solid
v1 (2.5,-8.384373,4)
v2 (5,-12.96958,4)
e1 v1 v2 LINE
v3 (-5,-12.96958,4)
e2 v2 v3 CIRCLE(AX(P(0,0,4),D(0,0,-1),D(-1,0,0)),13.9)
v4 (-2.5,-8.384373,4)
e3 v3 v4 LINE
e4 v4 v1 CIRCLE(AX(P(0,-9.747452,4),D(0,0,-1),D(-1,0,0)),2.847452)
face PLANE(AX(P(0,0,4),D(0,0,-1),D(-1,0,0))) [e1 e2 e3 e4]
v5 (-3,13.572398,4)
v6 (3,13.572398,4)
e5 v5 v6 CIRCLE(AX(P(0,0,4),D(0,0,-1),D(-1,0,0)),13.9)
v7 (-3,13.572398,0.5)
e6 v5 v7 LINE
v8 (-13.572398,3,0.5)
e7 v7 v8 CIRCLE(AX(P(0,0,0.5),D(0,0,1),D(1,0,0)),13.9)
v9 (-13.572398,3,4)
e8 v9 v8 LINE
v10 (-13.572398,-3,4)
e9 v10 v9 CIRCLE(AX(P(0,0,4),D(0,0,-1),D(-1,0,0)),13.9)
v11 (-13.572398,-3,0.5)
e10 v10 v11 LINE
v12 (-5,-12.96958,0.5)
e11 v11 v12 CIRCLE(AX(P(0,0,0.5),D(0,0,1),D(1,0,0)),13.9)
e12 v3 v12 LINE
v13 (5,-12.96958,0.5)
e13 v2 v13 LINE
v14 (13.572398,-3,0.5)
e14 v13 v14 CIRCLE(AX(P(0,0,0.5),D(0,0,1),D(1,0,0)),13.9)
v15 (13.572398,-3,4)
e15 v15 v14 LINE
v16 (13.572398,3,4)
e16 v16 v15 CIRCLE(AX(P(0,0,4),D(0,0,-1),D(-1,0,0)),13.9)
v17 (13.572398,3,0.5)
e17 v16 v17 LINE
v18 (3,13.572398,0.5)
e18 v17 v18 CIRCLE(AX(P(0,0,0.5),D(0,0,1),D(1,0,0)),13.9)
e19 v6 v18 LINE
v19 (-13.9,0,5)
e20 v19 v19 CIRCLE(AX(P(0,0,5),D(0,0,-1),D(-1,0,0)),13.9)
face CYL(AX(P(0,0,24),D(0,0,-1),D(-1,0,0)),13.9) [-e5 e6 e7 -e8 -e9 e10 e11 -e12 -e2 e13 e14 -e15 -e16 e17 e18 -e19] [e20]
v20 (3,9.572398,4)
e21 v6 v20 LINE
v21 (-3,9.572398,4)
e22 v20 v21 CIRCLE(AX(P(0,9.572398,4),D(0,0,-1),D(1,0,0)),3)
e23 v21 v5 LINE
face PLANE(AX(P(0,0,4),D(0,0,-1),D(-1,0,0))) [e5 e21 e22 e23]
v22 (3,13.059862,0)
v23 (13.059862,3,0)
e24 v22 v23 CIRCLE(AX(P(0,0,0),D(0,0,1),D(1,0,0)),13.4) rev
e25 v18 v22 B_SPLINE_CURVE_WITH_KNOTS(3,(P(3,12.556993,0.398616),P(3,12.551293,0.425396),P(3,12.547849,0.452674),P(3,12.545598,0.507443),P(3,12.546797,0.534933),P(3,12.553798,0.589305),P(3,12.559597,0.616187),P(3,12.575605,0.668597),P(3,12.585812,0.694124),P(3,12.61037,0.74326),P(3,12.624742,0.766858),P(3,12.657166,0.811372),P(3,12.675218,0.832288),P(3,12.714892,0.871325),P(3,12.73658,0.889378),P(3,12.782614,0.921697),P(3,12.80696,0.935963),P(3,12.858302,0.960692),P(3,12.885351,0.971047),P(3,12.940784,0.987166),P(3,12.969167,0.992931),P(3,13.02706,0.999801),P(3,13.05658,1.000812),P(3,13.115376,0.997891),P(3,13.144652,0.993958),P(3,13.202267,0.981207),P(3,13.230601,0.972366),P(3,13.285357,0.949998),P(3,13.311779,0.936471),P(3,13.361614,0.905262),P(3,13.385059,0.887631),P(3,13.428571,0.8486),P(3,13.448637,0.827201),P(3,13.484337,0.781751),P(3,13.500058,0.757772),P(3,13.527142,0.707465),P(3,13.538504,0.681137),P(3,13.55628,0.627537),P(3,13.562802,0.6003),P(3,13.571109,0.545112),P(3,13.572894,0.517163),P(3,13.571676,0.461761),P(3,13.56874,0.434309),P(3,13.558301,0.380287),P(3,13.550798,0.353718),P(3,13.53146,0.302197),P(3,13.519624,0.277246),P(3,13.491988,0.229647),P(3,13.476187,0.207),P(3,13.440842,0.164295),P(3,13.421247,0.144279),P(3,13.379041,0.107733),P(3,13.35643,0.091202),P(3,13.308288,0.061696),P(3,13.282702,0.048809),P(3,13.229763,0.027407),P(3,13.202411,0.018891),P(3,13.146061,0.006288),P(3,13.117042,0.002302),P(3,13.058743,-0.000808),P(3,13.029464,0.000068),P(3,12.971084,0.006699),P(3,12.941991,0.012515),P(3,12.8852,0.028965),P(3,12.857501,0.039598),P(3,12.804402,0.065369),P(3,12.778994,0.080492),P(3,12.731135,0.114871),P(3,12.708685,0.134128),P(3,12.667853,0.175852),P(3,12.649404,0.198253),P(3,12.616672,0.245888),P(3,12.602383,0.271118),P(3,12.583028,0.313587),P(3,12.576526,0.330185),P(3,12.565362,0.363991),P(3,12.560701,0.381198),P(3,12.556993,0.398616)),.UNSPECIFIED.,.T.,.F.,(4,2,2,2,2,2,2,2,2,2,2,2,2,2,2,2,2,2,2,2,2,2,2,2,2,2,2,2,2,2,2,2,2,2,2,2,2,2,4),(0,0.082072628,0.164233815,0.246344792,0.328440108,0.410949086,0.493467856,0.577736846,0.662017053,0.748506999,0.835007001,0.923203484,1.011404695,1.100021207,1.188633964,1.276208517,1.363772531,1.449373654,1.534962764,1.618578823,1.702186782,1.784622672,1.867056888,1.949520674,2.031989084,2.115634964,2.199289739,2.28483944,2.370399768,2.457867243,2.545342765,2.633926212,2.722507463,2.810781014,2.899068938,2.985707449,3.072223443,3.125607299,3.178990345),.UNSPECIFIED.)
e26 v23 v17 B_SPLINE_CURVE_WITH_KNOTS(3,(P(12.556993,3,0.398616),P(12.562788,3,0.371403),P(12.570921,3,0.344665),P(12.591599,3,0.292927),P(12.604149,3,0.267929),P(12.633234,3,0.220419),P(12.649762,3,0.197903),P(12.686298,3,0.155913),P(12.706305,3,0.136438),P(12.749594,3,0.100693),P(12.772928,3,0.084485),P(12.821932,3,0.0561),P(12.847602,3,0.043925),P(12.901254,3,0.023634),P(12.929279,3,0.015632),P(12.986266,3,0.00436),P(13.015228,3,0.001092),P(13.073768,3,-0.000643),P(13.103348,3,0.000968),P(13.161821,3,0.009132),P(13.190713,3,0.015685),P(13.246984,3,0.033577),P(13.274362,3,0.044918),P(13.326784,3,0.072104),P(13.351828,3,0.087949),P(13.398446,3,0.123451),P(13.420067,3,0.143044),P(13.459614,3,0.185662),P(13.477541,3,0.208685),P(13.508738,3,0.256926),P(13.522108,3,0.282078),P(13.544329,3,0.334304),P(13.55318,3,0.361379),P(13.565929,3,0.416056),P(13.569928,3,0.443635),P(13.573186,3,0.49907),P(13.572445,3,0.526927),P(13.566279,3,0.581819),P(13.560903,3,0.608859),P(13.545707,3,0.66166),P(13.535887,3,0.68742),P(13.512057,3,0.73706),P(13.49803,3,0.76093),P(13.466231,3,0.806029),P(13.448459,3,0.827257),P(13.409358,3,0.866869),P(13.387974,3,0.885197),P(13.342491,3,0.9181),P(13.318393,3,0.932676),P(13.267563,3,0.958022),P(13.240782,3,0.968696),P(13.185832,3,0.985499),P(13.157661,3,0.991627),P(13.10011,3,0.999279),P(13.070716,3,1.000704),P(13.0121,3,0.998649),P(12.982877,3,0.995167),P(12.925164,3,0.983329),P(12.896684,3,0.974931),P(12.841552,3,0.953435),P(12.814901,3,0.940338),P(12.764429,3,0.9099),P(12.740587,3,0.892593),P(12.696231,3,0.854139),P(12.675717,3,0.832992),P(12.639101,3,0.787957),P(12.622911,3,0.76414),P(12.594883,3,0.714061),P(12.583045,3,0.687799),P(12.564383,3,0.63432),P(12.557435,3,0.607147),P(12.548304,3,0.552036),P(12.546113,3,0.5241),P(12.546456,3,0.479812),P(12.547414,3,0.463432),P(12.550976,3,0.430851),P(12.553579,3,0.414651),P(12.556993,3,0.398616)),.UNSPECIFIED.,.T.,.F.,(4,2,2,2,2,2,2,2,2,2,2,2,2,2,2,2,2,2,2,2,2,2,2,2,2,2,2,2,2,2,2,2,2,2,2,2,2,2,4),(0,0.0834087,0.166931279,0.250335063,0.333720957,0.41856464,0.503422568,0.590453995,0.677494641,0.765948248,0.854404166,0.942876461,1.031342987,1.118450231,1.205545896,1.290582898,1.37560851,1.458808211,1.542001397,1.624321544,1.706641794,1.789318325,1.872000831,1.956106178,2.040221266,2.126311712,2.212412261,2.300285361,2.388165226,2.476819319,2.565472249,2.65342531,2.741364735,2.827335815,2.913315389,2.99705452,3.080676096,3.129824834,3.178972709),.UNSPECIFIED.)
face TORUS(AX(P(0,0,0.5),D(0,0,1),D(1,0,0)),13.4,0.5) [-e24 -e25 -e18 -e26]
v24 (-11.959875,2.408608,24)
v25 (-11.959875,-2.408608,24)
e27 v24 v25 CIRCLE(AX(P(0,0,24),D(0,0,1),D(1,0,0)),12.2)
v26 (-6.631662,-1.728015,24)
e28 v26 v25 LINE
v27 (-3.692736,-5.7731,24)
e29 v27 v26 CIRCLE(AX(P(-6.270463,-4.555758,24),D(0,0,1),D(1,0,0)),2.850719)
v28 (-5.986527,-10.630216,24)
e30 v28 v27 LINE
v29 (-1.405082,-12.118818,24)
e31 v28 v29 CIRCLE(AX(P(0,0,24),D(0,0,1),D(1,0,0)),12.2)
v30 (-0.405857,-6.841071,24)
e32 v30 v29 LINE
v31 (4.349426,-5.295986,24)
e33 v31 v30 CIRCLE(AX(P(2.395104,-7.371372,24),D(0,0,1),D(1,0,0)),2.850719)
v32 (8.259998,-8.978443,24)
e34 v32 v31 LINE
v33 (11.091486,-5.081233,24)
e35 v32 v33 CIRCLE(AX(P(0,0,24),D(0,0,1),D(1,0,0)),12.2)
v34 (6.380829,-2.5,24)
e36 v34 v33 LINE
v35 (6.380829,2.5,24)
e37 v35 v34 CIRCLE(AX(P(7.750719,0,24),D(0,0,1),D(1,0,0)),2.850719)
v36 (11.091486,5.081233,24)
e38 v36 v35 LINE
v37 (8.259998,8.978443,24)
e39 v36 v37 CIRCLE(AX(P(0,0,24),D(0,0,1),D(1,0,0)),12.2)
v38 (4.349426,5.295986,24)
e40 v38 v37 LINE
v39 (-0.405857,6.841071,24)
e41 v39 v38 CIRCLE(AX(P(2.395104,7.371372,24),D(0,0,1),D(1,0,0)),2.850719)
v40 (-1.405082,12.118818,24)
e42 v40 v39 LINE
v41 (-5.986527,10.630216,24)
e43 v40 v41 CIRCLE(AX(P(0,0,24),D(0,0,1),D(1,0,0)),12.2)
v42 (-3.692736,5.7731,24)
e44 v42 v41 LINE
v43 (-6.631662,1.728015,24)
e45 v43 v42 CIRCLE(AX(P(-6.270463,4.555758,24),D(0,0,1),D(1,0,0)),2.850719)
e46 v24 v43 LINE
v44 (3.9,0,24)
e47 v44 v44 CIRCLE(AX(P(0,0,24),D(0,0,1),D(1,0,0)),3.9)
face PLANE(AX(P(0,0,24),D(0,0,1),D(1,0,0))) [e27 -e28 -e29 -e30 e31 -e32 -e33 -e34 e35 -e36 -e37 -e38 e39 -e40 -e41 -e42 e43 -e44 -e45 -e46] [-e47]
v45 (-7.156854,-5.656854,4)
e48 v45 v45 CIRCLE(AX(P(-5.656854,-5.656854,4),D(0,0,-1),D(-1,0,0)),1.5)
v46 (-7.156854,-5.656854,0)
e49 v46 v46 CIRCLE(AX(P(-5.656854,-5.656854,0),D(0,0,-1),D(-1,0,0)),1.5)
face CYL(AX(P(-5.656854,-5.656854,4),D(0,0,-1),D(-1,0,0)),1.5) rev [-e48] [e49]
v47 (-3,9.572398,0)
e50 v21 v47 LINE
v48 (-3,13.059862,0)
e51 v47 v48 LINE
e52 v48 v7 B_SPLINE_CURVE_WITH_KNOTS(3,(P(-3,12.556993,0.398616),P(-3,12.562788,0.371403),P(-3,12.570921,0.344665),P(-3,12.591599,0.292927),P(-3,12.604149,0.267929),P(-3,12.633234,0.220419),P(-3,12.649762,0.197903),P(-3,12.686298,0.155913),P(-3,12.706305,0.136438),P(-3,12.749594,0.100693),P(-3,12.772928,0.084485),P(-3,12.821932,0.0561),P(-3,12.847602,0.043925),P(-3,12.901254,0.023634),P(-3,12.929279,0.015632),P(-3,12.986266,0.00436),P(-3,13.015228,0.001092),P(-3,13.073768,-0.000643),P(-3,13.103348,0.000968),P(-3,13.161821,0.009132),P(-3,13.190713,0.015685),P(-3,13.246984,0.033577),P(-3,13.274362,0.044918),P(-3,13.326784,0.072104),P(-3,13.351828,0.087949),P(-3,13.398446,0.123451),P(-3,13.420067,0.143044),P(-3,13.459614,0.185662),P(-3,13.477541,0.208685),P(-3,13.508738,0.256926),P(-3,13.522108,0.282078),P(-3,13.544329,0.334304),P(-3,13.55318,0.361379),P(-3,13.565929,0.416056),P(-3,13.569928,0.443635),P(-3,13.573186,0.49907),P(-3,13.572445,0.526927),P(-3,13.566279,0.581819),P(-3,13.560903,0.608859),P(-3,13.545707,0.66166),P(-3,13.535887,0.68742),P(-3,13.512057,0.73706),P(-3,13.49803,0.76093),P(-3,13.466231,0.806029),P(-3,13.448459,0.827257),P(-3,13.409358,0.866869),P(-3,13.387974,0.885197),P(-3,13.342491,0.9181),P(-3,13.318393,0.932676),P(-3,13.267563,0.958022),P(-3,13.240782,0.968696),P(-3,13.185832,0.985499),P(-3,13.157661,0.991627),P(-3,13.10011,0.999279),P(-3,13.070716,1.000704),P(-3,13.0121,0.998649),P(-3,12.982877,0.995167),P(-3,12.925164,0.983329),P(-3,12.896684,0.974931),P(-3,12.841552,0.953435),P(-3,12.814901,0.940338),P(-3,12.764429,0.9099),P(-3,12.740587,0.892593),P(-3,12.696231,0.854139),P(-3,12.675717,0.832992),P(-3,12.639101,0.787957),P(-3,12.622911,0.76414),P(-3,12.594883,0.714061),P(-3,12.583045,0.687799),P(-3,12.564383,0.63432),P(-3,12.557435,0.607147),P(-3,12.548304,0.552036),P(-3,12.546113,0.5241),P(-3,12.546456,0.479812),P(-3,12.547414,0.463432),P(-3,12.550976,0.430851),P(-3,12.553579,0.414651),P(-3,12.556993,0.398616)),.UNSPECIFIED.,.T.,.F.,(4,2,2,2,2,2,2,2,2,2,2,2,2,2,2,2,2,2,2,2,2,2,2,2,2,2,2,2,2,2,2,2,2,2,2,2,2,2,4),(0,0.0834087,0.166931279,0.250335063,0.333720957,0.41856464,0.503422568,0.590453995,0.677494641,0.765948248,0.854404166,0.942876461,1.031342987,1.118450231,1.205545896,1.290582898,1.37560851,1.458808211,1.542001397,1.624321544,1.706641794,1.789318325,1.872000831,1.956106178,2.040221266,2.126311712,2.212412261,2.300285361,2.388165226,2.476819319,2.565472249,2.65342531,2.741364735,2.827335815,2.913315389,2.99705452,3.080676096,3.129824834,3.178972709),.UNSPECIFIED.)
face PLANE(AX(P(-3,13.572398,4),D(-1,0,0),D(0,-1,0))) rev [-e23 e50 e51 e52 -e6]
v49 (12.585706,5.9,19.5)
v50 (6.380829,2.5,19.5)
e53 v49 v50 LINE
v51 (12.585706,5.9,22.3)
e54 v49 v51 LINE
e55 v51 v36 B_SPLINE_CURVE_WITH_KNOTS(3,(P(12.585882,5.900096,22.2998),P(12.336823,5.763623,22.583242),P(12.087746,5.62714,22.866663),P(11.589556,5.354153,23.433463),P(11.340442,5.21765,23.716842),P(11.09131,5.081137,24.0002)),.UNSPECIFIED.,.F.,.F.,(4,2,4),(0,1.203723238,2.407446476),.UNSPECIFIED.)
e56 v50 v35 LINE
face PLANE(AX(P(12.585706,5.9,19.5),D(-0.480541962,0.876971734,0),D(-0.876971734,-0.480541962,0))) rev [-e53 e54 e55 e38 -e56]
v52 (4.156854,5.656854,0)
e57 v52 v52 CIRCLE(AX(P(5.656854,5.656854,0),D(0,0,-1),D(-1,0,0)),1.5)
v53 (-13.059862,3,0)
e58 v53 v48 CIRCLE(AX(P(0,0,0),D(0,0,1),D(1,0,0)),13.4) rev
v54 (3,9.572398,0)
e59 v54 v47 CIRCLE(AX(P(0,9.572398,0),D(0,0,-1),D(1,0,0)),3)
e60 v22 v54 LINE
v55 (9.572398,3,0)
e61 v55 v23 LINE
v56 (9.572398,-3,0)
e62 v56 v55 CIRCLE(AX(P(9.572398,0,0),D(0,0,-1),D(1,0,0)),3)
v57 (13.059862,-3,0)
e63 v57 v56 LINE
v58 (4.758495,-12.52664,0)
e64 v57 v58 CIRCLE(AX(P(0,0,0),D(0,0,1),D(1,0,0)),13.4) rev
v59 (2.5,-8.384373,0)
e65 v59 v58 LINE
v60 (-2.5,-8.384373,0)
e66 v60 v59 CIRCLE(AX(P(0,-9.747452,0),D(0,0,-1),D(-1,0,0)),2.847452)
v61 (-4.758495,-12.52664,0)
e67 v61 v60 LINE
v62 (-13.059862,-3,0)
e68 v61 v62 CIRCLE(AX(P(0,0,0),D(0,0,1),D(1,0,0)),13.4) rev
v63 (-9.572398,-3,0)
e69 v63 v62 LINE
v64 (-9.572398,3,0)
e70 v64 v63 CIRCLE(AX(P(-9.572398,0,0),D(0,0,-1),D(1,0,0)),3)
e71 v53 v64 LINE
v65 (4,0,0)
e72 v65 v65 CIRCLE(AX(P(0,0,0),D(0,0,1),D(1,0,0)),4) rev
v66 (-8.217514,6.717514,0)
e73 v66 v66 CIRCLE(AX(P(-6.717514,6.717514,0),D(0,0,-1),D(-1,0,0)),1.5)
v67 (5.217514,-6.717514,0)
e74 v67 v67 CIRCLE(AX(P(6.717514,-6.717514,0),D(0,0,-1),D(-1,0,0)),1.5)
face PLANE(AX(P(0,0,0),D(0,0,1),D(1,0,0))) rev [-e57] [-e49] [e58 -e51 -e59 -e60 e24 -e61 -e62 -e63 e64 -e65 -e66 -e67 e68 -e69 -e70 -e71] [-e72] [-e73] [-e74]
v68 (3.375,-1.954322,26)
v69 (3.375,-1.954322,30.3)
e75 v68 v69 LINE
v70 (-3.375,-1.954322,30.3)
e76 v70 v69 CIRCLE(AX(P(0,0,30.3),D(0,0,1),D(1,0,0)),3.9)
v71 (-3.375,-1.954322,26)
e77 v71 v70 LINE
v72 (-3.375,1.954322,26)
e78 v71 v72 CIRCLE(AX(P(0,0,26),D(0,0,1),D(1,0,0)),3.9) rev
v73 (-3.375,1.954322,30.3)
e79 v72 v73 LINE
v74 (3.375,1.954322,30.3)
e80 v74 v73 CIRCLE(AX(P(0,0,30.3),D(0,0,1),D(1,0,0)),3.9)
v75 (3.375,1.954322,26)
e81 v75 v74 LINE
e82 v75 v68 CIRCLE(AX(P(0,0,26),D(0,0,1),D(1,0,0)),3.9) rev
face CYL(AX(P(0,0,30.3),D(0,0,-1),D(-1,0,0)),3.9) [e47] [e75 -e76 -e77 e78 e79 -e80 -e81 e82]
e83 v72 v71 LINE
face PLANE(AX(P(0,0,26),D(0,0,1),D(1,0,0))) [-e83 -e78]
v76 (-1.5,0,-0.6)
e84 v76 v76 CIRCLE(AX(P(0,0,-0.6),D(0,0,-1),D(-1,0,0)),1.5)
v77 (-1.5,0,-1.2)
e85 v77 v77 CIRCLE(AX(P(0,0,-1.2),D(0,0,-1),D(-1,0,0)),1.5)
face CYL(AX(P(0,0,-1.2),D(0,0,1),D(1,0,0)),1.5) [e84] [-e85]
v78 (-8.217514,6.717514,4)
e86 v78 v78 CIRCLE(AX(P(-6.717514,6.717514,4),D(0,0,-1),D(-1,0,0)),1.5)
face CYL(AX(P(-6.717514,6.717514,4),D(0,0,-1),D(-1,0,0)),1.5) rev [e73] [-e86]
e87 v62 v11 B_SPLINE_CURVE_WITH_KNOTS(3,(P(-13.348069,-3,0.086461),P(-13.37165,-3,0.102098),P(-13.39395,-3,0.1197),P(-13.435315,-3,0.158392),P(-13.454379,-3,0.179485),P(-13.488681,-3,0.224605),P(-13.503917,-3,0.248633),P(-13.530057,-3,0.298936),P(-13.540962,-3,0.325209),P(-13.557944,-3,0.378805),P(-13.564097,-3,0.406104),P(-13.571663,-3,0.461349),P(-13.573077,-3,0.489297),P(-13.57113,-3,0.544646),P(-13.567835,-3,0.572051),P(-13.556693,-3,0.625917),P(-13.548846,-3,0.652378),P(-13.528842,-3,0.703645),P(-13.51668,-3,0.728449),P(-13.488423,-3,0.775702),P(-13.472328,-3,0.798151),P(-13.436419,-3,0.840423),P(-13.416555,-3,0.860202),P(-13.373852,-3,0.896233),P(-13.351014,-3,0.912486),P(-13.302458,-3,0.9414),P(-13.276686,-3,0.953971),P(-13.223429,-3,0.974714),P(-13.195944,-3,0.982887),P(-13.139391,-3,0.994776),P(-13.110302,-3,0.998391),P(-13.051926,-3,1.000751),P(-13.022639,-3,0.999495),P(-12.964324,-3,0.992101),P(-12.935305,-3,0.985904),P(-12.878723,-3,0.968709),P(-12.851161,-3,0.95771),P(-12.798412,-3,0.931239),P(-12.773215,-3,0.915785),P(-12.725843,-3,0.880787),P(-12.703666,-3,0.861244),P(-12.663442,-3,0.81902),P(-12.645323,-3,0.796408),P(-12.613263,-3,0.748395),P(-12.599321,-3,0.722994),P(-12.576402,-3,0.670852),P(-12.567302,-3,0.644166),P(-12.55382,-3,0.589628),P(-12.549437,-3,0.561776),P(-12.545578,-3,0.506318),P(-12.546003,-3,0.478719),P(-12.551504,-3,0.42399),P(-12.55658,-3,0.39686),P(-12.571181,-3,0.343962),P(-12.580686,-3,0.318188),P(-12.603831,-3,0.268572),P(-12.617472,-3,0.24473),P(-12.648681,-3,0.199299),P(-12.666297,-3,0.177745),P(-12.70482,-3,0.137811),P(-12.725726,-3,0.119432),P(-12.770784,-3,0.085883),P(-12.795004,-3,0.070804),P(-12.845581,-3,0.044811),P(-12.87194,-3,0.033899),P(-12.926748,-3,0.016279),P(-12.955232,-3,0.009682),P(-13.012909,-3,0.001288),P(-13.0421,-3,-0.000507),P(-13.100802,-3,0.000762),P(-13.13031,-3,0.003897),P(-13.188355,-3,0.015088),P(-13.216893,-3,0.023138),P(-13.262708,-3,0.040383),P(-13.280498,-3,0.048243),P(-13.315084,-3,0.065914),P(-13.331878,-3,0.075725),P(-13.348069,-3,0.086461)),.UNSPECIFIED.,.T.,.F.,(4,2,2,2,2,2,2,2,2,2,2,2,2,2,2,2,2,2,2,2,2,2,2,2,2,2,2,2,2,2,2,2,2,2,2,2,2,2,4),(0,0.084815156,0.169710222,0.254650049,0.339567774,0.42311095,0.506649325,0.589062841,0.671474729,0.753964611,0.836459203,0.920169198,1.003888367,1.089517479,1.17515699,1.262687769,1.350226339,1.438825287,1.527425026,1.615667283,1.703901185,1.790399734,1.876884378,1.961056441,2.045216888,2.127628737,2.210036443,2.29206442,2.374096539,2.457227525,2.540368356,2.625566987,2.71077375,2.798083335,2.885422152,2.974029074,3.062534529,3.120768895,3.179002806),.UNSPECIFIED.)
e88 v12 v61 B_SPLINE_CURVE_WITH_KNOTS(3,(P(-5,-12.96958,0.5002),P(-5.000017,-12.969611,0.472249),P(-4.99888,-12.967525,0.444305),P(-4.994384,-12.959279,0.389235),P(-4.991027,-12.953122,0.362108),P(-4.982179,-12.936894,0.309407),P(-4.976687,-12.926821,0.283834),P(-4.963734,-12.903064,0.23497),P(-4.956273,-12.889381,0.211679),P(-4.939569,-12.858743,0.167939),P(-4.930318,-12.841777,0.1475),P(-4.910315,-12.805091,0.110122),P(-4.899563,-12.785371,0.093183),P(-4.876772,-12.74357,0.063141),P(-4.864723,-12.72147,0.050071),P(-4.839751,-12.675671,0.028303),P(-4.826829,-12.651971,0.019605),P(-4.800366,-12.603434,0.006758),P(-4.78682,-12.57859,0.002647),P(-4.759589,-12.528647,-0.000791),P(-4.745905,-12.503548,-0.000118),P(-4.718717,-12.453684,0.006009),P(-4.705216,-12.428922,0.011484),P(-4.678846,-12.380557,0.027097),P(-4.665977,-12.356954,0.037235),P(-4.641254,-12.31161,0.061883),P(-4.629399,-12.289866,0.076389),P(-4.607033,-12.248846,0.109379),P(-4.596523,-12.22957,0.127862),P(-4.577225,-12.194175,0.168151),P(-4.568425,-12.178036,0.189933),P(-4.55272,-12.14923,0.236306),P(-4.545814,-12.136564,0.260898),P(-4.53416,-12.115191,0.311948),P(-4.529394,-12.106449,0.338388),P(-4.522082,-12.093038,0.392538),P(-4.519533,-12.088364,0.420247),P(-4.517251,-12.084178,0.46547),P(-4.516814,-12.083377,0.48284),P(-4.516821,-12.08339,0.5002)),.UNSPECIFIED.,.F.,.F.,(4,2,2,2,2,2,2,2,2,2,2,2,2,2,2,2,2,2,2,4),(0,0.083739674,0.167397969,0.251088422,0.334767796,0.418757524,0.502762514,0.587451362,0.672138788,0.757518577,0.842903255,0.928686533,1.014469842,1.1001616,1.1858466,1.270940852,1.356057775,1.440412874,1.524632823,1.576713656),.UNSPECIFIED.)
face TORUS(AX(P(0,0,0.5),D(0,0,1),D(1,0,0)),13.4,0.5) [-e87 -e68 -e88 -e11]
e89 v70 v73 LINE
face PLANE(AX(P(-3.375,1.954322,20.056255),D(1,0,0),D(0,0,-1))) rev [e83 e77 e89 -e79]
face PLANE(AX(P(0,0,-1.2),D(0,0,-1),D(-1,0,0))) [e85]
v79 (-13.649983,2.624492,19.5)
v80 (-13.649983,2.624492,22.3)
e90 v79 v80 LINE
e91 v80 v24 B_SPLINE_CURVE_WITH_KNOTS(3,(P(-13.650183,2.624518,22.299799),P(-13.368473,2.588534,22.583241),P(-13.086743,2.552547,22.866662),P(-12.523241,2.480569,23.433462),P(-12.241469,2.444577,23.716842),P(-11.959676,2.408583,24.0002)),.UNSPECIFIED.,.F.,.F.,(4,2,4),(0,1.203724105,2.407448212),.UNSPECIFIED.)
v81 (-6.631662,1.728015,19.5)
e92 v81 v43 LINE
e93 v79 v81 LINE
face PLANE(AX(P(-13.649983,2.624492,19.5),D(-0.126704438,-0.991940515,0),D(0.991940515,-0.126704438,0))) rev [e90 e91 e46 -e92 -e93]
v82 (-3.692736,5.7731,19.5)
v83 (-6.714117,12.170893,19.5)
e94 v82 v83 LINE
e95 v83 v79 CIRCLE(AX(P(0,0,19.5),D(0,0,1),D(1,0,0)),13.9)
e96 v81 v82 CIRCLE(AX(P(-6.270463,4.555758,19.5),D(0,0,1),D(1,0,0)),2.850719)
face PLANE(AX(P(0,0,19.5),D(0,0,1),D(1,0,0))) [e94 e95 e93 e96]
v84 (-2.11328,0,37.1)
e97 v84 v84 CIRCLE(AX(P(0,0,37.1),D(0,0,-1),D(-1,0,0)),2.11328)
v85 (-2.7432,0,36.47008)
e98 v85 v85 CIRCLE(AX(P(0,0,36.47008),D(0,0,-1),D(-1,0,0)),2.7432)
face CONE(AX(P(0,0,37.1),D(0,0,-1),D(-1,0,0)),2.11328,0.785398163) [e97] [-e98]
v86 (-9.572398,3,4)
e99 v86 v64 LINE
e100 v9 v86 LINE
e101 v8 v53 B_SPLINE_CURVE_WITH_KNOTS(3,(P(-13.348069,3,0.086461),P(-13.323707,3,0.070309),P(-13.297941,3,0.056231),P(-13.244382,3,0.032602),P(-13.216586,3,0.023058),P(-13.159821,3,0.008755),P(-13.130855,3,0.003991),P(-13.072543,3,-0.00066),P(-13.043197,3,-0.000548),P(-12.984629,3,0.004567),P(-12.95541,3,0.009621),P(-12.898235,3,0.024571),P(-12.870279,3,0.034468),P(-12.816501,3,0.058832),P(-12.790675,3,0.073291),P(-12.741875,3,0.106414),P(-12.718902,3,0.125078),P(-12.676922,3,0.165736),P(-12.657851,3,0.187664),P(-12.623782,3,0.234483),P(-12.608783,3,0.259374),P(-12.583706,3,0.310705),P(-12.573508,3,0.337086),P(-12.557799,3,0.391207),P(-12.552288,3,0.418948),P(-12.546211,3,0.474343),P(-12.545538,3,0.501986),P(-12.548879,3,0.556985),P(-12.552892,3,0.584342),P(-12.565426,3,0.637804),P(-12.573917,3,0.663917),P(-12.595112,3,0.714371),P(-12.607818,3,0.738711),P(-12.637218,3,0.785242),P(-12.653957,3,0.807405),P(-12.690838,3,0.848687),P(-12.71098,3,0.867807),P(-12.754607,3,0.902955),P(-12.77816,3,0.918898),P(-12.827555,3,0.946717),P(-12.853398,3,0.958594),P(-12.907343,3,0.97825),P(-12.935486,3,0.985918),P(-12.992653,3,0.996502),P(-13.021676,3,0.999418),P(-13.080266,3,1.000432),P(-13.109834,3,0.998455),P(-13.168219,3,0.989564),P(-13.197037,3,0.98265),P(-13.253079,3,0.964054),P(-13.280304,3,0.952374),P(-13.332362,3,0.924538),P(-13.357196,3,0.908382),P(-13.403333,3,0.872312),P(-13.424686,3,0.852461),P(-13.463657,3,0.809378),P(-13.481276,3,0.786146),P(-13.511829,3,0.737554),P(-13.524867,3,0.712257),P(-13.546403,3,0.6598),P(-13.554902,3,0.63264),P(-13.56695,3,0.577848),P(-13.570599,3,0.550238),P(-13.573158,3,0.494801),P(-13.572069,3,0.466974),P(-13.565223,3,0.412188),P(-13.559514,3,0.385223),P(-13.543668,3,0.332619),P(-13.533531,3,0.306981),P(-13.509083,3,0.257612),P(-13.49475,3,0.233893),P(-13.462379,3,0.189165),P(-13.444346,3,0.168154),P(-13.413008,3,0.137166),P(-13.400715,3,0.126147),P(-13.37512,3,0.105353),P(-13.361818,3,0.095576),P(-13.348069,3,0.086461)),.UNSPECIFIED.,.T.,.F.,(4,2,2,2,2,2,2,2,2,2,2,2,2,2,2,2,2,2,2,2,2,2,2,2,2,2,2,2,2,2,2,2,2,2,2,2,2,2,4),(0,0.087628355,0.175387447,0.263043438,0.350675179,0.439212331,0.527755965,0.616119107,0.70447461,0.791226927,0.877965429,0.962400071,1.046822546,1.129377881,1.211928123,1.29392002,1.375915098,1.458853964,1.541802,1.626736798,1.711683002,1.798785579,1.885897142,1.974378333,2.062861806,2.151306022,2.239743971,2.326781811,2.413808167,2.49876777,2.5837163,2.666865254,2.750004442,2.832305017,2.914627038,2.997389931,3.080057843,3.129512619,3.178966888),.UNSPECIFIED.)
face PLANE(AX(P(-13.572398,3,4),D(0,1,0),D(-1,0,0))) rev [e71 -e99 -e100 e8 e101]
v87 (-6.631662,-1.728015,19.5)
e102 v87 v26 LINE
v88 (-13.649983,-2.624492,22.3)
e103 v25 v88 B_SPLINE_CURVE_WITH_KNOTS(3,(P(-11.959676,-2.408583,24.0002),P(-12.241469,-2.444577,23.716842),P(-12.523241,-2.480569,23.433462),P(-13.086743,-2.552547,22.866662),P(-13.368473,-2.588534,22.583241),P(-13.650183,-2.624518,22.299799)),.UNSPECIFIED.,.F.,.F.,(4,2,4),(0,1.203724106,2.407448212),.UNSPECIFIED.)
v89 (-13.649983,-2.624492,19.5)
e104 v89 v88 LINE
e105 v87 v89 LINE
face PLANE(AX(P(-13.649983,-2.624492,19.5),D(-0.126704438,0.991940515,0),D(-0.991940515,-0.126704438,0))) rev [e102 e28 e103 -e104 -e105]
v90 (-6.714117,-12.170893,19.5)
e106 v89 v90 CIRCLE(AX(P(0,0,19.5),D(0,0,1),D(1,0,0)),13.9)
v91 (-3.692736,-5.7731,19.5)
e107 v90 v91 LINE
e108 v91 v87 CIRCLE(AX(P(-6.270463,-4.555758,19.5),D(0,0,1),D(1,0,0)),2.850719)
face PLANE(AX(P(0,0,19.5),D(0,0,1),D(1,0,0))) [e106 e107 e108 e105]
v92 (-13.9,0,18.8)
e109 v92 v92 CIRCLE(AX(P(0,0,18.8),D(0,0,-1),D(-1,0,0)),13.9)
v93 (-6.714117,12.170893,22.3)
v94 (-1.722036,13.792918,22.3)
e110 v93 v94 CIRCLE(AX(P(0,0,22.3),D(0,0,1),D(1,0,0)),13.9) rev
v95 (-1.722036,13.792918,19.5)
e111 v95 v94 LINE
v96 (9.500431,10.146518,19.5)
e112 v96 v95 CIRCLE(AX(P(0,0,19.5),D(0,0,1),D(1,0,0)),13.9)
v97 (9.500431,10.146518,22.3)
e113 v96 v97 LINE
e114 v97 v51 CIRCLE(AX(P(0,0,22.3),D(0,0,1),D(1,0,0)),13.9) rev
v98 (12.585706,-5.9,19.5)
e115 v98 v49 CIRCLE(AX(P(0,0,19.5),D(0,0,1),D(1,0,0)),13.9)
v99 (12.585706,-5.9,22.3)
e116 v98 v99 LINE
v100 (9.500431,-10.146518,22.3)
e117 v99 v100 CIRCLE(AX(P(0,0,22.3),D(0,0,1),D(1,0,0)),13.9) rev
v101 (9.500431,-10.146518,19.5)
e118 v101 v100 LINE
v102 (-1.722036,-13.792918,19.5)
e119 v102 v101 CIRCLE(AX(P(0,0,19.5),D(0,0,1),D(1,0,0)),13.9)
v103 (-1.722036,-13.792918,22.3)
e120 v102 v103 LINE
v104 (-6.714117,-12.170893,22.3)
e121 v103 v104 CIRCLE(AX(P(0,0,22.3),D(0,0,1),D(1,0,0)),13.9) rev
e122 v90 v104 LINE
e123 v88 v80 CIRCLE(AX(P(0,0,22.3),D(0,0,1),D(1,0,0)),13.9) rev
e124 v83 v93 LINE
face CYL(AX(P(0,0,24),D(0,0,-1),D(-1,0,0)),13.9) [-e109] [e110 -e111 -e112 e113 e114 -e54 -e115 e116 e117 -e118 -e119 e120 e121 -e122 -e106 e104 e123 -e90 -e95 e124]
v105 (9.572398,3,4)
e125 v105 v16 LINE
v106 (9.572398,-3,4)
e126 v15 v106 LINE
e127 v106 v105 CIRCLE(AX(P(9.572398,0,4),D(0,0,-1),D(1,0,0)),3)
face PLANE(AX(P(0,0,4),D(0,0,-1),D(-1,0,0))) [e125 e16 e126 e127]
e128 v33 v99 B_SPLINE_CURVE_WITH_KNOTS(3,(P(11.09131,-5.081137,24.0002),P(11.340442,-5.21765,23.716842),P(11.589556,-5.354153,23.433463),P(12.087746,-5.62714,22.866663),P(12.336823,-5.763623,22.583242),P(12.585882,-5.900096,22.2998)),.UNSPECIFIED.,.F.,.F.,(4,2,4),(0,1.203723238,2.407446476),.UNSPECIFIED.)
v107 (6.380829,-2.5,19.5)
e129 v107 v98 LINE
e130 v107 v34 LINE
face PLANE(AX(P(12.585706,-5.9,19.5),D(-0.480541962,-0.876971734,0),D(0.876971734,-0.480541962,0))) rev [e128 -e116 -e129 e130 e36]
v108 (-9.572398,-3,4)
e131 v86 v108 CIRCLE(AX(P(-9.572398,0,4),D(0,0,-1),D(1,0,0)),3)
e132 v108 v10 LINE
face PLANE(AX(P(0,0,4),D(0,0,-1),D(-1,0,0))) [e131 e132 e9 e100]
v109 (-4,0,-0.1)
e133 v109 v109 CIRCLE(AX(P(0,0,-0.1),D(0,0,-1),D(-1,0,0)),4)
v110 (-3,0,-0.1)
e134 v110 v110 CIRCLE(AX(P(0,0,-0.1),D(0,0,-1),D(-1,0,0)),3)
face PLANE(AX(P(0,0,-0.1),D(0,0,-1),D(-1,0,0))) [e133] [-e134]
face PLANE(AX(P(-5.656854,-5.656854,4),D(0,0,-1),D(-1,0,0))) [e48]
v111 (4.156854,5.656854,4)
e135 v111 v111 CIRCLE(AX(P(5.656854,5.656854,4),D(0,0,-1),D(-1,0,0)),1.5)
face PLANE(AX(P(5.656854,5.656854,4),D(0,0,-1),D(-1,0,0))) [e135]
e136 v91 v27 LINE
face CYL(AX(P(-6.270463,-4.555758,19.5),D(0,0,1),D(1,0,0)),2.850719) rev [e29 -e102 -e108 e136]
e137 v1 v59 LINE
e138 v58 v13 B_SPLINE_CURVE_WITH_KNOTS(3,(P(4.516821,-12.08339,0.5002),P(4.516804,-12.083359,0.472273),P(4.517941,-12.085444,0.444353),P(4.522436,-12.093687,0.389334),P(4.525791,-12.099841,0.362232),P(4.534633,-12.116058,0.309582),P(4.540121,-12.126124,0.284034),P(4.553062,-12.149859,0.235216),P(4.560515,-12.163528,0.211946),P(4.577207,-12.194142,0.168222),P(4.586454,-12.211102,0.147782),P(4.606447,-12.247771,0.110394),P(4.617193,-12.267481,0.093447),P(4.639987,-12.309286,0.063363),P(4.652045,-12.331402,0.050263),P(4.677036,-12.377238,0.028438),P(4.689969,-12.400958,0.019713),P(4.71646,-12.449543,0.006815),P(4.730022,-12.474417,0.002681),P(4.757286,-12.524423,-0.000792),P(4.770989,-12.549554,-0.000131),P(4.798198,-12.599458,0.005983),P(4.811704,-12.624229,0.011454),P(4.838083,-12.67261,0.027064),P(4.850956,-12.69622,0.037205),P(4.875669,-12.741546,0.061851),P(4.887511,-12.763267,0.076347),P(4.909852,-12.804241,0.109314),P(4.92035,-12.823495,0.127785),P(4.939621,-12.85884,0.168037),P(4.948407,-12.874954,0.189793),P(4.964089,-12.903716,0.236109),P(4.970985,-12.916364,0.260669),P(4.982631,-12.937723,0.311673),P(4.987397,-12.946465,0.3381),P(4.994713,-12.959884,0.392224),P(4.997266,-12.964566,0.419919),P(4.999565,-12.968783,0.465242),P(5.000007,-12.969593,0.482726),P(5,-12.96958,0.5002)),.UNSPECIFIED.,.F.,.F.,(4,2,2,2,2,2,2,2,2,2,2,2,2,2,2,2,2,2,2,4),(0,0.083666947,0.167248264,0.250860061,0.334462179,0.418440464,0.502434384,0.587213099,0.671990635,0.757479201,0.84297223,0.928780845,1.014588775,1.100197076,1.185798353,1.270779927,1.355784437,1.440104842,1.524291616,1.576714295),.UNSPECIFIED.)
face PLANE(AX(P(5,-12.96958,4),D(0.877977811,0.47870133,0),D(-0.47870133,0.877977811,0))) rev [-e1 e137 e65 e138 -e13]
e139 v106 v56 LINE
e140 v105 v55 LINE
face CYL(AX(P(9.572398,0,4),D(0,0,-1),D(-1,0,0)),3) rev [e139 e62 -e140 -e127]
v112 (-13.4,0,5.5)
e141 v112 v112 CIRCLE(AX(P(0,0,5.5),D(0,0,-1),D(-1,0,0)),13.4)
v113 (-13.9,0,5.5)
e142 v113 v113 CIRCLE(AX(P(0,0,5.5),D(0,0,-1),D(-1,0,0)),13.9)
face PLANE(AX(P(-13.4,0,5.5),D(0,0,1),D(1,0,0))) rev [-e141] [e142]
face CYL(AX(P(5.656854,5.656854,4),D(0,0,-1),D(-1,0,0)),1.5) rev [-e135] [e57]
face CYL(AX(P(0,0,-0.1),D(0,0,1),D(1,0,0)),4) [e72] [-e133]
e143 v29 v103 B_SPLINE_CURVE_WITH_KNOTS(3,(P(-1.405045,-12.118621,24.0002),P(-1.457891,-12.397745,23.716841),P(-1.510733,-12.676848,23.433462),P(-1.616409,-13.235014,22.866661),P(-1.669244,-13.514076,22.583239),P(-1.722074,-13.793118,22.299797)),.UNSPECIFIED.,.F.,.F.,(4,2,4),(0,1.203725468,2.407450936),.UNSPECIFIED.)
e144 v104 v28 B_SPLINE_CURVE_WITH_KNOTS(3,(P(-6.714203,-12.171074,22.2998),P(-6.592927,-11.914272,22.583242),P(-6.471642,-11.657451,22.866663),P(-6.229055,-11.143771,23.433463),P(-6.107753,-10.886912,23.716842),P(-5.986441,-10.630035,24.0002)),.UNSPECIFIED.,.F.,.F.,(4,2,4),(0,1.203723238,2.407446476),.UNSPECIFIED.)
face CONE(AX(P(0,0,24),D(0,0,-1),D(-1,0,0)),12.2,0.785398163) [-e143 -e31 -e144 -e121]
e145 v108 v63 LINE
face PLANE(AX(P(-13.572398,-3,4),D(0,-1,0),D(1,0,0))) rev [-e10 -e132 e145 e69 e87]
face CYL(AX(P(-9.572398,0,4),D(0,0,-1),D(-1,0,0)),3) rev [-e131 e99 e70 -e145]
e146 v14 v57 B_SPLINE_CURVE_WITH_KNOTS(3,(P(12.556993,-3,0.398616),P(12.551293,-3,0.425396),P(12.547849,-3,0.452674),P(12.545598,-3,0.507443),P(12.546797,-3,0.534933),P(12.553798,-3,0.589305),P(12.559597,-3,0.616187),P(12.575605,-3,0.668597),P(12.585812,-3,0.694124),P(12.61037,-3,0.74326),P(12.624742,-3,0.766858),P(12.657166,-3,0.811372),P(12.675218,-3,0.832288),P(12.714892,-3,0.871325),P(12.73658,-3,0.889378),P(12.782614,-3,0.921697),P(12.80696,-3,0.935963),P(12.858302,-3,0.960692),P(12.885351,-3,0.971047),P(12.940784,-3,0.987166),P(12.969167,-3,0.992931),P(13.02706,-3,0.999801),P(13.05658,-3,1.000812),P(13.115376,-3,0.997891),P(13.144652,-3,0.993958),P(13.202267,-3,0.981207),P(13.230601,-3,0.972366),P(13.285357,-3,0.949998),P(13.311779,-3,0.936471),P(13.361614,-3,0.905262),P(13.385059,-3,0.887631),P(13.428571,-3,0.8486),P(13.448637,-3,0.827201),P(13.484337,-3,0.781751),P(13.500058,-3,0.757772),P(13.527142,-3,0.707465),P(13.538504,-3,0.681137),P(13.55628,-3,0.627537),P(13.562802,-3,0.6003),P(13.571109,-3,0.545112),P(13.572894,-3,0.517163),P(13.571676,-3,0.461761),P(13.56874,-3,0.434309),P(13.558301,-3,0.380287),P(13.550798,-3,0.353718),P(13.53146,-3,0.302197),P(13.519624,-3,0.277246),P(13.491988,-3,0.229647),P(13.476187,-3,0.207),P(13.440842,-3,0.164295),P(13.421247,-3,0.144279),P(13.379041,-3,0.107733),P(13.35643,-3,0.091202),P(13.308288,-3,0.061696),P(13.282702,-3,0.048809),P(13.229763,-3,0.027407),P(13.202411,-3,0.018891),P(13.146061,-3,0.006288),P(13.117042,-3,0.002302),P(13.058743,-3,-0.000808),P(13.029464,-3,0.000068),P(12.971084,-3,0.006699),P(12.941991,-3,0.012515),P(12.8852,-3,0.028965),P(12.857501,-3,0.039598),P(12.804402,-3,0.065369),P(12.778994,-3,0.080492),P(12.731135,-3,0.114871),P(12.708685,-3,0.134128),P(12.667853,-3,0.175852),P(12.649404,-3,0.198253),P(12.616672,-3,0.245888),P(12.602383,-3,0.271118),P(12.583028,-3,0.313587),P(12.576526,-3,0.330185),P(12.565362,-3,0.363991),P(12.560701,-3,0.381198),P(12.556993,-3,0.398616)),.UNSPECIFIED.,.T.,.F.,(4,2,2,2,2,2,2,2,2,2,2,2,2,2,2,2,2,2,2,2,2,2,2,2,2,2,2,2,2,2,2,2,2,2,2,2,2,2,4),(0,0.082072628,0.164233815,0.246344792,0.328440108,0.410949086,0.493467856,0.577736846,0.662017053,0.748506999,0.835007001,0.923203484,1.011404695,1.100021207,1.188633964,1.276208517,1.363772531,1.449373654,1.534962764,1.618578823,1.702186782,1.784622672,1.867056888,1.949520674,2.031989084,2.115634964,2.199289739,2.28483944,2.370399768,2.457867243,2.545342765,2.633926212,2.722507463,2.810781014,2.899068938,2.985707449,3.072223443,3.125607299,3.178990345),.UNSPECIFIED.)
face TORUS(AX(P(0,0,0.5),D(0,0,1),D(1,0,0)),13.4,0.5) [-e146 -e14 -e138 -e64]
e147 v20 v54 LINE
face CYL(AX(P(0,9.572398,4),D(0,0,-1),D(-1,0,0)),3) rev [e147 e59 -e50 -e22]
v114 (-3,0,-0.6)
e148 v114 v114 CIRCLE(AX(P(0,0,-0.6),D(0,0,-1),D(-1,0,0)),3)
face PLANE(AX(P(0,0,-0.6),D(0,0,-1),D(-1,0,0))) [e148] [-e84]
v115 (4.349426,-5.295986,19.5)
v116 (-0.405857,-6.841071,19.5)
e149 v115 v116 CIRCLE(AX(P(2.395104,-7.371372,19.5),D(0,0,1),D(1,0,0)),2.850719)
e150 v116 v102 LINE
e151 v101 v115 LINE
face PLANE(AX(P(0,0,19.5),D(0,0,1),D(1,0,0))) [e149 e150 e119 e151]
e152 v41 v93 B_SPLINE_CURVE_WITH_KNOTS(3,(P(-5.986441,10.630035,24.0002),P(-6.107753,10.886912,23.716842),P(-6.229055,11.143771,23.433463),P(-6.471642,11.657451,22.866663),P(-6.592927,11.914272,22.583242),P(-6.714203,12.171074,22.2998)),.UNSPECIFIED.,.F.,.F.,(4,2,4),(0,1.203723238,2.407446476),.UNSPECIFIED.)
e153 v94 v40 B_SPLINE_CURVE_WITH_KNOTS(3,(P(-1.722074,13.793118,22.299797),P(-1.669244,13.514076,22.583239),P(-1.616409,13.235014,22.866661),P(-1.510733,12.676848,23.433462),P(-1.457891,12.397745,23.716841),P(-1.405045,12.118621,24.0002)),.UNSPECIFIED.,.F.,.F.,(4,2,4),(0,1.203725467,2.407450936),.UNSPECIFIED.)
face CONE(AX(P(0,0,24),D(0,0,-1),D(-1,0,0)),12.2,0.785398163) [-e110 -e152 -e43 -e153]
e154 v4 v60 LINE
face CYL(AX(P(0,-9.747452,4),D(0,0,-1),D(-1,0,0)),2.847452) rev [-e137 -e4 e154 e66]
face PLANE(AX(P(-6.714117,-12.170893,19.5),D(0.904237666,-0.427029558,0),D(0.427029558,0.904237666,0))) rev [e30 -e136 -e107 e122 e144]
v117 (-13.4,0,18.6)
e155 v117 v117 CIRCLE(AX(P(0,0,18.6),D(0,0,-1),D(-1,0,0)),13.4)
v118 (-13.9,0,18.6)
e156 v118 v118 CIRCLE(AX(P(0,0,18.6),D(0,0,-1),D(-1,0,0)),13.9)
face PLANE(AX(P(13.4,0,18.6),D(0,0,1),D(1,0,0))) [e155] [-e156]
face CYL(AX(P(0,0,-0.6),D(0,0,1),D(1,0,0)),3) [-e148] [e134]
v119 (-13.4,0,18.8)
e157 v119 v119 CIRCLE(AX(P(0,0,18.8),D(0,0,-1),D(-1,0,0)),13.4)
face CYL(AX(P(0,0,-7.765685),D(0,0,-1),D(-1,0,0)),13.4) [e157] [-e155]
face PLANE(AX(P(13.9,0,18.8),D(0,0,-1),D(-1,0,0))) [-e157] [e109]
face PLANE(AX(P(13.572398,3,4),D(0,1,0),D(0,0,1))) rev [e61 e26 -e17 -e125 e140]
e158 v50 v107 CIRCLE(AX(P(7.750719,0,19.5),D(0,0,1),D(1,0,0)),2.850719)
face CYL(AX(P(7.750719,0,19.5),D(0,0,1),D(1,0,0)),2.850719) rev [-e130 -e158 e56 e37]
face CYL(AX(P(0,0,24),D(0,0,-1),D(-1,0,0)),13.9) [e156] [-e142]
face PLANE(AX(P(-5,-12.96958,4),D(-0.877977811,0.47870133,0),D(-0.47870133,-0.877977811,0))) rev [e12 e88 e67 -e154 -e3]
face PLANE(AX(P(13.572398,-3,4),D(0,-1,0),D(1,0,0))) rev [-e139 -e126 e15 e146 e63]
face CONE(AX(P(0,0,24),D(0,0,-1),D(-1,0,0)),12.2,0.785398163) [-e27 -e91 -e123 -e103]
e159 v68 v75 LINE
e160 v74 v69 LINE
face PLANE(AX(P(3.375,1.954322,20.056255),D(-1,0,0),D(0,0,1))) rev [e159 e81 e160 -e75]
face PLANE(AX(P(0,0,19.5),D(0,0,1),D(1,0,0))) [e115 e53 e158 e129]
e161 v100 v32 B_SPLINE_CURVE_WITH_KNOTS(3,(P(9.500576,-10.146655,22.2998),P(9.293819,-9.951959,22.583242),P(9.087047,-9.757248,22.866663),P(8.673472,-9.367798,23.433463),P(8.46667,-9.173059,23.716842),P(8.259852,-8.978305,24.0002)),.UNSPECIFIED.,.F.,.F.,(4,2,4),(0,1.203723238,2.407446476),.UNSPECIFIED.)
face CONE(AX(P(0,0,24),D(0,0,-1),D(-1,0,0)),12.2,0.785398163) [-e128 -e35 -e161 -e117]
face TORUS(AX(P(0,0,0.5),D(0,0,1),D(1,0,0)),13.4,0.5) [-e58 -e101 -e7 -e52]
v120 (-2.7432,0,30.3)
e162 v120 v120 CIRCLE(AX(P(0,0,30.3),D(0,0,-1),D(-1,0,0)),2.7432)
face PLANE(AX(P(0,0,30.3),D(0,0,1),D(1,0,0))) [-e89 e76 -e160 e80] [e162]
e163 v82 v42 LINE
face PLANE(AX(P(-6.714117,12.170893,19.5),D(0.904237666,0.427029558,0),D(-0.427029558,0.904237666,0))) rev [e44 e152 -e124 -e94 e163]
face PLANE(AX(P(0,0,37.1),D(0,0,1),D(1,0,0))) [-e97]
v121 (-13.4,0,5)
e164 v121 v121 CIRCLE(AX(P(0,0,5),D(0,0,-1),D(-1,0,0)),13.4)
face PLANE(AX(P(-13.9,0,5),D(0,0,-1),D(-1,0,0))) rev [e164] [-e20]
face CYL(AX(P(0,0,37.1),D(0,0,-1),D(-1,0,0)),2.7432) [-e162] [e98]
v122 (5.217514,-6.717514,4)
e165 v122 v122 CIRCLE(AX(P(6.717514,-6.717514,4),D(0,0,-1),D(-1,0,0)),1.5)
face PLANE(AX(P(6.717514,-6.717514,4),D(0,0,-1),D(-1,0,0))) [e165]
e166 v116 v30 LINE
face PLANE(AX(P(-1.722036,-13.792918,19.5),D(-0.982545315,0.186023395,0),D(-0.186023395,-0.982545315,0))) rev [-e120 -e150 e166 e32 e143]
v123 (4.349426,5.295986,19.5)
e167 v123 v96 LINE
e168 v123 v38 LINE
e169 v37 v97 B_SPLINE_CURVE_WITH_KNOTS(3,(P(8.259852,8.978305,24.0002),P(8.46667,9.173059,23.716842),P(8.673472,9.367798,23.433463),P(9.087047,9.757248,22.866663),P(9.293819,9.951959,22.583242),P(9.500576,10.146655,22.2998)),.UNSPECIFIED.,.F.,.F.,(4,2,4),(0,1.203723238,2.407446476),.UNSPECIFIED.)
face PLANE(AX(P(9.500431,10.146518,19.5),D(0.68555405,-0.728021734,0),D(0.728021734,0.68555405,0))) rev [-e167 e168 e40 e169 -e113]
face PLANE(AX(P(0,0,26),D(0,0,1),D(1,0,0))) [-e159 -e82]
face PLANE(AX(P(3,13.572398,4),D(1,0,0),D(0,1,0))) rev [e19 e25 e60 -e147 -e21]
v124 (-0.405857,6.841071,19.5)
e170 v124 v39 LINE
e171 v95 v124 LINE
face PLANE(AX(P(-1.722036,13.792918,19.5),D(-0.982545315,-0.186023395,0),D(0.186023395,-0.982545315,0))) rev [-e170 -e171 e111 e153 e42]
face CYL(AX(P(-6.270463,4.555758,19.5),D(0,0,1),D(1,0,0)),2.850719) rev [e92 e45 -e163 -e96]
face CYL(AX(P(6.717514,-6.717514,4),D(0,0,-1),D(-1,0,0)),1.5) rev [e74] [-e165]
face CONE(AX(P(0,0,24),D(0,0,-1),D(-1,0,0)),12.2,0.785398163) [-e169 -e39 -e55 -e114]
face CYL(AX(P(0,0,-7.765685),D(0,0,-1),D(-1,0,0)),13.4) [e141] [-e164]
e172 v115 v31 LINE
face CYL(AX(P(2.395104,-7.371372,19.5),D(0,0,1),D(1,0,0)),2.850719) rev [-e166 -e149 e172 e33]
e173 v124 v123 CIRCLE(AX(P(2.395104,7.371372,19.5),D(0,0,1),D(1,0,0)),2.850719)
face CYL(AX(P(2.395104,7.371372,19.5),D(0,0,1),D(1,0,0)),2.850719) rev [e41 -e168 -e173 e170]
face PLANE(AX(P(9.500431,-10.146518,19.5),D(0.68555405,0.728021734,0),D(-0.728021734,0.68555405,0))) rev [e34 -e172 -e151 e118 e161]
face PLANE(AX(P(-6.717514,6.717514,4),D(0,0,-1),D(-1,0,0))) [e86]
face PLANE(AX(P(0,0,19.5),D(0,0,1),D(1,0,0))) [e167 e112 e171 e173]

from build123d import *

# Parameters (mm, degrees)
SKETCH1_R           = 13.9
BOSS_EXTRUDE1_DEPTH = 24
FILLET1_R           = 0.5
CUT_EXTRUDE1_DEPTH  = 4
CUT_EXTRUDE2_DEPTH  = 4
SKETCH4_R           = 4
BOSS_EXTRUDE2_DEPTH = 0.1
SKETCH5_R           = 3
BOSS_EXTRUDE3_DEPTH = 0.5
SKETCH6_R           = 1.5
BOSS_EXTRUDE4_DEPTH = 0.6
SKETCH7_R           = 1.5
CUT_EXTRUDE3_DEPTH  = 4
CHAMFER1_SIZE       = 1.7
CUT_EXTRUDE4_START  = -4.5
CUT_EXTRUDE4_DEPTH  = 4.5
SKETCH9_R           = 3.9
BOSS_EXTRUDE5_DEPTH = 6.3
CUT_EXTRUDE5_START  = -4.3
CUT_EXTRUDE5_DEPTH  = 4.3
SKETCH10_R          = 2.9
BOSS_EXTRUDE6_DEPTH = 6.8
SKETCH16_W          = 0.5
SKETCH16_H          = 0.5
SKETCH16_H_2        = 0.2


# Read off the part's stored shape, not the designer's step: #12-24 Machine Threads Stud1
with BuildPart() as part:
    # Sketch1 → Boss-Extrude1 (new body)
    with BuildSketch(Plane.XY):
        Circle(SKETCH1_R)
    extrude(amount=BOSS_EXTRUDE1_DEPTH)

    # Fillet1
    fillet1_edges = [part.edges().sort_by_distance(p)[0] for p in [
        (-13.9, 0, 0),
    ]]
    fillet(fillet1_edges, radius=FILLET1_R)

    # Sketch2 → Cut-Extrude1 (cut)
    with BuildSketch(Plane(origin=(0, 0, 0), x_dir=(-1, 0, 0), z_dir=(0, 0, -1))):
        with BuildLine():
            Line((-13.572398462, 3), (-9.572398462, 3))
            ThreePointArc((-9.572398462, 3), (-6.572398365, 0), (-9.572398462, -3))
            Line((-9.572398462, -3), (-13.572398462, -3))
            ThreePointArc((-13.572398462, -3), (-13.9, 0), (-13.572398462, 3))
        make_face()
        with BuildLine():
            Line((3, 13.572398462), (3, 9.572398462))
            ThreePointArc((3, 9.572398462), (0, 6.572398365), (-3, 9.572398462))
            Line((-3, 9.572398462), (-3, 13.572398462))
            ThreePointArc((-3, 13.572398462), (0, 13.9), (3, 13.572398462))
        make_face()
        with BuildLine():
            Line((13.572398462, -3), (9.572398462, -3))
            ThreePointArc((9.572398462, -3), (6.572398365, 0), (9.572398462, 3))
            Line((9.572398462, 3), (13.572398462, 3))
            ThreePointArc((13.572398462, 3), (13.9, 0), (13.572398462, -3))
        make_face()
    extrude(amount=-CUT_EXTRUDE1_DEPTH, mode=Mode.SUBTRACT)

    # Sketch3 → Cut-Extrude2 (cut)
    with BuildSketch(Plane(origin=(0, 0, 0), x_dir=(-1, 0, 0), z_dir=(0, 0, -1))):
        with BuildLine():
            Line((-5, -12.969579793), (-2.5, -8.384373134))
            ThreePointArc((-2.5, -8.384373134), (0, -6.9), (2.5, -8.384373134))
            Line((2.5, -8.384373134), (5, -12.969579793))
            ThreePointArc((5, -12.969579793), (0, -13.9), (-5, -12.969579793))
        make_face()
    extrude(amount=-CUT_EXTRUDE2_DEPTH, mode=Mode.SUBTRACT)

    # Sketch4 → Boss-Extrude2 (add)
    with BuildSketch(Plane(origin=(0, 0, 0), x_dir=(-1, 0, 0), z_dir=(0, 0, -1))):
        with Locations(Location((0, 0, 0), (0, 0, 180))):
            Circle(SKETCH4_R)
    extrude(amount=BOSS_EXTRUDE2_DEPTH)

    # Sketch5 → Boss-Extrude3 (add)
    with BuildSketch(Plane(origin=(0, 0, -0.1), x_dir=(-1, 0, 0), z_dir=(0, 0, -1))):
        Circle(SKETCH5_R)
    extrude(amount=BOSS_EXTRUDE3_DEPTH)

    # Sketch6 → Boss-Extrude4 (add)
    with BuildSketch(Plane(origin=(0, 0, -0.6), x_dir=(-1, 0, 0), z_dir=(0, 0, -1))):
        Circle(SKETCH6_R)
    extrude(amount=BOSS_EXTRUDE4_DEPTH)

    # Sketch7 → Cut-Extrude3 (cut)
    with BuildSketch(Plane(origin=(0, 0, 0), x_dir=(-1, 0, 0), z_dir=(0, 0, -1))):
        with Locations((-5.656854249, 5.656854249)):
            Circle(SKETCH7_R)
        with Locations((6.717514421, 6.717514421)):
            Circle(SKETCH7_R)
        with Locations((5.656854249, -5.656854249)):
            Circle(SKETCH7_R)
        with Locations((-6.717514421, -6.717514421)):
            Circle(SKETCH7_R)
    extrude(amount=-CUT_EXTRUDE3_DEPTH, mode=Mode.SUBTRACT)

    # Chamfer1
    chamfer1_edges = [part.edges().sort_by_distance(p)[0] for p in [
        (-13.9, 0, 24),
    ]]
    chamfer(chamfer1_edges, length=CHAMFER1_SIZE)

    # Sketch8 → Cut-Extrude4 (cut)
    with BuildSketch(Plane.XY.offset(24).offset(CUT_EXTRUDE4_START)):
        with BuildLine():
            Line((12.585706178, 5.9), (6.380828907, 2.5))
            ThreePointArc((6.380828907, 2.5), (4.9, 0), (6.380828907, -2.5))
            Line((6.380828907, -2.5), (12.585706178, -5.9))
            ThreePointArc((12.585706178, -5.9), (13.9, 0), (12.585706178, 5.9))
        make_face()
        with BuildLine():
            Line((9.500430541, -10.146517606), (4.349425861, -5.295986426))
            ThreePointArc((4.349425861, -5.295986426), (1.514183272, -4.66017693), (-0.40585672, -6.841071398))
            Line((-0.40585672, -6.841071398), (-1.722036351, -13.79291814))
            ThreePointArc((-1.722036351, -13.79291814), (4.295336222, -13.219685577), (9.500430541, -10.146517606))
        make_face()
        with BuildLine():
            Line((-6.714117196, -12.170892748), (-3.692735894, -5.773099615))
            ThreePointArc((-3.692735894, -5.773099615), (-3.964183272, -2.880147736), (-6.631662155, -1.728014643))
            Line((-6.631662155, -1.728014643), (-13.649983173, -2.624492214))
            ThreePointArc((-13.649983173, -2.624492214), (-11.245336222, -8.170215007), (-6.714117196, -12.170892748))
        make_face()
        with BuildLine():
            Line((-13.649983173, 2.624492214), (-6.631662155, 1.728014643))
            ThreePointArc((-6.631662155, 1.728014643), (-3.964183272, 2.880147736), (-3.692735894, 5.773099615))
            Line((-3.692735894, 5.773099615), (-6.714117196, 12.170892748))
            ThreePointArc((-6.714117196, 12.170892748), (-11.245336222, 8.170215007), (-13.649983173, 2.624492214))
        make_face()
        with BuildLine():
            Line((-1.722036351, 13.79291814), (-0.40585672, 6.841071398))
            ThreePointArc((-0.40585672, 6.841071398), (1.514183272, 4.66017693), (4.349425861, 5.295986426))
            Line((4.349425861, 5.295986426), (9.500430541, 10.146517606))
            ThreePointArc((9.500430541, 10.146517606), (4.295336222, 13.219685577), (-1.722036351, 13.79291814))
        make_face()
    extrude(amount=CUT_EXTRUDE4_DEPTH, mode=Mode.SUBTRACT)

    # Sketch9 → Boss-Extrude5 (add)
    with BuildSketch(Plane.XY.offset(24)):
        Circle(SKETCH9_R)
    extrude(amount=BOSS_EXTRUDE5_DEPTH)

    # Sketch11 → Cut-Extrude5 (cut)
    with BuildSketch(Plane.XY.offset(30.3).offset(CUT_EXTRUDE5_START)):
        with BuildLine():
            Line((3.375, 1.954322133), (3.375, -1.954322133))
            ThreePointArc((3.375, -1.954322133), (3.9, 0), (3.375, 1.954322133))
        make_face()
        with BuildLine():
            Line((-3.375, 1.954322133), (-3.375, -1.954322133))
            ThreePointArc((-3.375, -1.954322133), (-3.9, 0), (-3.375, 1.954322133))
        make_face()
    extrude(amount=CUT_EXTRUDE5_DEPTH, mode=Mode.SUBTRACT)

    # Sketch10 → Boss-Extrude6 (add)
    with BuildSketch(Plane.XY.offset(30.3)):
        Circle(SKETCH10_R)
    extrude(amount=BOSS_EXTRUDE6_DEPTH)

    # #12-24 Machine Threads Stud1 outline → #12-24 Machine Threads Stud1 (revolve, cut)
    with BuildSketch(Plane.XZ):
        Polygon((2.7432, 36.47008), (2.7432, 30.3), (2.9, 30.3), (2.9, 37.1), (2.11328, 37.1), align=None)
    revolve(axis=Axis((0, 0, 0), (0, 0, 1)), mode=Mode.SUBTRACT)

    # Sketch16 → Cut-Revolve1 (revolve, cut)
    with BuildSketch(Plane(origin=(0, 0, 0), x_dir=(1, 0, 0), z_dir=(0, 1, 0))):
        with Locations((-13.65, -5.25)):
            Rectangle(SKETCH16_W, SKETCH16_H)
        with Locations((13.65, -18.7)):
            Rectangle(SKETCH16_W, SKETCH16_H_2)
    revolve(axis=Axis((0, 0, -7.765685178), (0, 0, 1)), mode=Mode.SUBTRACT)


solid = part.part
